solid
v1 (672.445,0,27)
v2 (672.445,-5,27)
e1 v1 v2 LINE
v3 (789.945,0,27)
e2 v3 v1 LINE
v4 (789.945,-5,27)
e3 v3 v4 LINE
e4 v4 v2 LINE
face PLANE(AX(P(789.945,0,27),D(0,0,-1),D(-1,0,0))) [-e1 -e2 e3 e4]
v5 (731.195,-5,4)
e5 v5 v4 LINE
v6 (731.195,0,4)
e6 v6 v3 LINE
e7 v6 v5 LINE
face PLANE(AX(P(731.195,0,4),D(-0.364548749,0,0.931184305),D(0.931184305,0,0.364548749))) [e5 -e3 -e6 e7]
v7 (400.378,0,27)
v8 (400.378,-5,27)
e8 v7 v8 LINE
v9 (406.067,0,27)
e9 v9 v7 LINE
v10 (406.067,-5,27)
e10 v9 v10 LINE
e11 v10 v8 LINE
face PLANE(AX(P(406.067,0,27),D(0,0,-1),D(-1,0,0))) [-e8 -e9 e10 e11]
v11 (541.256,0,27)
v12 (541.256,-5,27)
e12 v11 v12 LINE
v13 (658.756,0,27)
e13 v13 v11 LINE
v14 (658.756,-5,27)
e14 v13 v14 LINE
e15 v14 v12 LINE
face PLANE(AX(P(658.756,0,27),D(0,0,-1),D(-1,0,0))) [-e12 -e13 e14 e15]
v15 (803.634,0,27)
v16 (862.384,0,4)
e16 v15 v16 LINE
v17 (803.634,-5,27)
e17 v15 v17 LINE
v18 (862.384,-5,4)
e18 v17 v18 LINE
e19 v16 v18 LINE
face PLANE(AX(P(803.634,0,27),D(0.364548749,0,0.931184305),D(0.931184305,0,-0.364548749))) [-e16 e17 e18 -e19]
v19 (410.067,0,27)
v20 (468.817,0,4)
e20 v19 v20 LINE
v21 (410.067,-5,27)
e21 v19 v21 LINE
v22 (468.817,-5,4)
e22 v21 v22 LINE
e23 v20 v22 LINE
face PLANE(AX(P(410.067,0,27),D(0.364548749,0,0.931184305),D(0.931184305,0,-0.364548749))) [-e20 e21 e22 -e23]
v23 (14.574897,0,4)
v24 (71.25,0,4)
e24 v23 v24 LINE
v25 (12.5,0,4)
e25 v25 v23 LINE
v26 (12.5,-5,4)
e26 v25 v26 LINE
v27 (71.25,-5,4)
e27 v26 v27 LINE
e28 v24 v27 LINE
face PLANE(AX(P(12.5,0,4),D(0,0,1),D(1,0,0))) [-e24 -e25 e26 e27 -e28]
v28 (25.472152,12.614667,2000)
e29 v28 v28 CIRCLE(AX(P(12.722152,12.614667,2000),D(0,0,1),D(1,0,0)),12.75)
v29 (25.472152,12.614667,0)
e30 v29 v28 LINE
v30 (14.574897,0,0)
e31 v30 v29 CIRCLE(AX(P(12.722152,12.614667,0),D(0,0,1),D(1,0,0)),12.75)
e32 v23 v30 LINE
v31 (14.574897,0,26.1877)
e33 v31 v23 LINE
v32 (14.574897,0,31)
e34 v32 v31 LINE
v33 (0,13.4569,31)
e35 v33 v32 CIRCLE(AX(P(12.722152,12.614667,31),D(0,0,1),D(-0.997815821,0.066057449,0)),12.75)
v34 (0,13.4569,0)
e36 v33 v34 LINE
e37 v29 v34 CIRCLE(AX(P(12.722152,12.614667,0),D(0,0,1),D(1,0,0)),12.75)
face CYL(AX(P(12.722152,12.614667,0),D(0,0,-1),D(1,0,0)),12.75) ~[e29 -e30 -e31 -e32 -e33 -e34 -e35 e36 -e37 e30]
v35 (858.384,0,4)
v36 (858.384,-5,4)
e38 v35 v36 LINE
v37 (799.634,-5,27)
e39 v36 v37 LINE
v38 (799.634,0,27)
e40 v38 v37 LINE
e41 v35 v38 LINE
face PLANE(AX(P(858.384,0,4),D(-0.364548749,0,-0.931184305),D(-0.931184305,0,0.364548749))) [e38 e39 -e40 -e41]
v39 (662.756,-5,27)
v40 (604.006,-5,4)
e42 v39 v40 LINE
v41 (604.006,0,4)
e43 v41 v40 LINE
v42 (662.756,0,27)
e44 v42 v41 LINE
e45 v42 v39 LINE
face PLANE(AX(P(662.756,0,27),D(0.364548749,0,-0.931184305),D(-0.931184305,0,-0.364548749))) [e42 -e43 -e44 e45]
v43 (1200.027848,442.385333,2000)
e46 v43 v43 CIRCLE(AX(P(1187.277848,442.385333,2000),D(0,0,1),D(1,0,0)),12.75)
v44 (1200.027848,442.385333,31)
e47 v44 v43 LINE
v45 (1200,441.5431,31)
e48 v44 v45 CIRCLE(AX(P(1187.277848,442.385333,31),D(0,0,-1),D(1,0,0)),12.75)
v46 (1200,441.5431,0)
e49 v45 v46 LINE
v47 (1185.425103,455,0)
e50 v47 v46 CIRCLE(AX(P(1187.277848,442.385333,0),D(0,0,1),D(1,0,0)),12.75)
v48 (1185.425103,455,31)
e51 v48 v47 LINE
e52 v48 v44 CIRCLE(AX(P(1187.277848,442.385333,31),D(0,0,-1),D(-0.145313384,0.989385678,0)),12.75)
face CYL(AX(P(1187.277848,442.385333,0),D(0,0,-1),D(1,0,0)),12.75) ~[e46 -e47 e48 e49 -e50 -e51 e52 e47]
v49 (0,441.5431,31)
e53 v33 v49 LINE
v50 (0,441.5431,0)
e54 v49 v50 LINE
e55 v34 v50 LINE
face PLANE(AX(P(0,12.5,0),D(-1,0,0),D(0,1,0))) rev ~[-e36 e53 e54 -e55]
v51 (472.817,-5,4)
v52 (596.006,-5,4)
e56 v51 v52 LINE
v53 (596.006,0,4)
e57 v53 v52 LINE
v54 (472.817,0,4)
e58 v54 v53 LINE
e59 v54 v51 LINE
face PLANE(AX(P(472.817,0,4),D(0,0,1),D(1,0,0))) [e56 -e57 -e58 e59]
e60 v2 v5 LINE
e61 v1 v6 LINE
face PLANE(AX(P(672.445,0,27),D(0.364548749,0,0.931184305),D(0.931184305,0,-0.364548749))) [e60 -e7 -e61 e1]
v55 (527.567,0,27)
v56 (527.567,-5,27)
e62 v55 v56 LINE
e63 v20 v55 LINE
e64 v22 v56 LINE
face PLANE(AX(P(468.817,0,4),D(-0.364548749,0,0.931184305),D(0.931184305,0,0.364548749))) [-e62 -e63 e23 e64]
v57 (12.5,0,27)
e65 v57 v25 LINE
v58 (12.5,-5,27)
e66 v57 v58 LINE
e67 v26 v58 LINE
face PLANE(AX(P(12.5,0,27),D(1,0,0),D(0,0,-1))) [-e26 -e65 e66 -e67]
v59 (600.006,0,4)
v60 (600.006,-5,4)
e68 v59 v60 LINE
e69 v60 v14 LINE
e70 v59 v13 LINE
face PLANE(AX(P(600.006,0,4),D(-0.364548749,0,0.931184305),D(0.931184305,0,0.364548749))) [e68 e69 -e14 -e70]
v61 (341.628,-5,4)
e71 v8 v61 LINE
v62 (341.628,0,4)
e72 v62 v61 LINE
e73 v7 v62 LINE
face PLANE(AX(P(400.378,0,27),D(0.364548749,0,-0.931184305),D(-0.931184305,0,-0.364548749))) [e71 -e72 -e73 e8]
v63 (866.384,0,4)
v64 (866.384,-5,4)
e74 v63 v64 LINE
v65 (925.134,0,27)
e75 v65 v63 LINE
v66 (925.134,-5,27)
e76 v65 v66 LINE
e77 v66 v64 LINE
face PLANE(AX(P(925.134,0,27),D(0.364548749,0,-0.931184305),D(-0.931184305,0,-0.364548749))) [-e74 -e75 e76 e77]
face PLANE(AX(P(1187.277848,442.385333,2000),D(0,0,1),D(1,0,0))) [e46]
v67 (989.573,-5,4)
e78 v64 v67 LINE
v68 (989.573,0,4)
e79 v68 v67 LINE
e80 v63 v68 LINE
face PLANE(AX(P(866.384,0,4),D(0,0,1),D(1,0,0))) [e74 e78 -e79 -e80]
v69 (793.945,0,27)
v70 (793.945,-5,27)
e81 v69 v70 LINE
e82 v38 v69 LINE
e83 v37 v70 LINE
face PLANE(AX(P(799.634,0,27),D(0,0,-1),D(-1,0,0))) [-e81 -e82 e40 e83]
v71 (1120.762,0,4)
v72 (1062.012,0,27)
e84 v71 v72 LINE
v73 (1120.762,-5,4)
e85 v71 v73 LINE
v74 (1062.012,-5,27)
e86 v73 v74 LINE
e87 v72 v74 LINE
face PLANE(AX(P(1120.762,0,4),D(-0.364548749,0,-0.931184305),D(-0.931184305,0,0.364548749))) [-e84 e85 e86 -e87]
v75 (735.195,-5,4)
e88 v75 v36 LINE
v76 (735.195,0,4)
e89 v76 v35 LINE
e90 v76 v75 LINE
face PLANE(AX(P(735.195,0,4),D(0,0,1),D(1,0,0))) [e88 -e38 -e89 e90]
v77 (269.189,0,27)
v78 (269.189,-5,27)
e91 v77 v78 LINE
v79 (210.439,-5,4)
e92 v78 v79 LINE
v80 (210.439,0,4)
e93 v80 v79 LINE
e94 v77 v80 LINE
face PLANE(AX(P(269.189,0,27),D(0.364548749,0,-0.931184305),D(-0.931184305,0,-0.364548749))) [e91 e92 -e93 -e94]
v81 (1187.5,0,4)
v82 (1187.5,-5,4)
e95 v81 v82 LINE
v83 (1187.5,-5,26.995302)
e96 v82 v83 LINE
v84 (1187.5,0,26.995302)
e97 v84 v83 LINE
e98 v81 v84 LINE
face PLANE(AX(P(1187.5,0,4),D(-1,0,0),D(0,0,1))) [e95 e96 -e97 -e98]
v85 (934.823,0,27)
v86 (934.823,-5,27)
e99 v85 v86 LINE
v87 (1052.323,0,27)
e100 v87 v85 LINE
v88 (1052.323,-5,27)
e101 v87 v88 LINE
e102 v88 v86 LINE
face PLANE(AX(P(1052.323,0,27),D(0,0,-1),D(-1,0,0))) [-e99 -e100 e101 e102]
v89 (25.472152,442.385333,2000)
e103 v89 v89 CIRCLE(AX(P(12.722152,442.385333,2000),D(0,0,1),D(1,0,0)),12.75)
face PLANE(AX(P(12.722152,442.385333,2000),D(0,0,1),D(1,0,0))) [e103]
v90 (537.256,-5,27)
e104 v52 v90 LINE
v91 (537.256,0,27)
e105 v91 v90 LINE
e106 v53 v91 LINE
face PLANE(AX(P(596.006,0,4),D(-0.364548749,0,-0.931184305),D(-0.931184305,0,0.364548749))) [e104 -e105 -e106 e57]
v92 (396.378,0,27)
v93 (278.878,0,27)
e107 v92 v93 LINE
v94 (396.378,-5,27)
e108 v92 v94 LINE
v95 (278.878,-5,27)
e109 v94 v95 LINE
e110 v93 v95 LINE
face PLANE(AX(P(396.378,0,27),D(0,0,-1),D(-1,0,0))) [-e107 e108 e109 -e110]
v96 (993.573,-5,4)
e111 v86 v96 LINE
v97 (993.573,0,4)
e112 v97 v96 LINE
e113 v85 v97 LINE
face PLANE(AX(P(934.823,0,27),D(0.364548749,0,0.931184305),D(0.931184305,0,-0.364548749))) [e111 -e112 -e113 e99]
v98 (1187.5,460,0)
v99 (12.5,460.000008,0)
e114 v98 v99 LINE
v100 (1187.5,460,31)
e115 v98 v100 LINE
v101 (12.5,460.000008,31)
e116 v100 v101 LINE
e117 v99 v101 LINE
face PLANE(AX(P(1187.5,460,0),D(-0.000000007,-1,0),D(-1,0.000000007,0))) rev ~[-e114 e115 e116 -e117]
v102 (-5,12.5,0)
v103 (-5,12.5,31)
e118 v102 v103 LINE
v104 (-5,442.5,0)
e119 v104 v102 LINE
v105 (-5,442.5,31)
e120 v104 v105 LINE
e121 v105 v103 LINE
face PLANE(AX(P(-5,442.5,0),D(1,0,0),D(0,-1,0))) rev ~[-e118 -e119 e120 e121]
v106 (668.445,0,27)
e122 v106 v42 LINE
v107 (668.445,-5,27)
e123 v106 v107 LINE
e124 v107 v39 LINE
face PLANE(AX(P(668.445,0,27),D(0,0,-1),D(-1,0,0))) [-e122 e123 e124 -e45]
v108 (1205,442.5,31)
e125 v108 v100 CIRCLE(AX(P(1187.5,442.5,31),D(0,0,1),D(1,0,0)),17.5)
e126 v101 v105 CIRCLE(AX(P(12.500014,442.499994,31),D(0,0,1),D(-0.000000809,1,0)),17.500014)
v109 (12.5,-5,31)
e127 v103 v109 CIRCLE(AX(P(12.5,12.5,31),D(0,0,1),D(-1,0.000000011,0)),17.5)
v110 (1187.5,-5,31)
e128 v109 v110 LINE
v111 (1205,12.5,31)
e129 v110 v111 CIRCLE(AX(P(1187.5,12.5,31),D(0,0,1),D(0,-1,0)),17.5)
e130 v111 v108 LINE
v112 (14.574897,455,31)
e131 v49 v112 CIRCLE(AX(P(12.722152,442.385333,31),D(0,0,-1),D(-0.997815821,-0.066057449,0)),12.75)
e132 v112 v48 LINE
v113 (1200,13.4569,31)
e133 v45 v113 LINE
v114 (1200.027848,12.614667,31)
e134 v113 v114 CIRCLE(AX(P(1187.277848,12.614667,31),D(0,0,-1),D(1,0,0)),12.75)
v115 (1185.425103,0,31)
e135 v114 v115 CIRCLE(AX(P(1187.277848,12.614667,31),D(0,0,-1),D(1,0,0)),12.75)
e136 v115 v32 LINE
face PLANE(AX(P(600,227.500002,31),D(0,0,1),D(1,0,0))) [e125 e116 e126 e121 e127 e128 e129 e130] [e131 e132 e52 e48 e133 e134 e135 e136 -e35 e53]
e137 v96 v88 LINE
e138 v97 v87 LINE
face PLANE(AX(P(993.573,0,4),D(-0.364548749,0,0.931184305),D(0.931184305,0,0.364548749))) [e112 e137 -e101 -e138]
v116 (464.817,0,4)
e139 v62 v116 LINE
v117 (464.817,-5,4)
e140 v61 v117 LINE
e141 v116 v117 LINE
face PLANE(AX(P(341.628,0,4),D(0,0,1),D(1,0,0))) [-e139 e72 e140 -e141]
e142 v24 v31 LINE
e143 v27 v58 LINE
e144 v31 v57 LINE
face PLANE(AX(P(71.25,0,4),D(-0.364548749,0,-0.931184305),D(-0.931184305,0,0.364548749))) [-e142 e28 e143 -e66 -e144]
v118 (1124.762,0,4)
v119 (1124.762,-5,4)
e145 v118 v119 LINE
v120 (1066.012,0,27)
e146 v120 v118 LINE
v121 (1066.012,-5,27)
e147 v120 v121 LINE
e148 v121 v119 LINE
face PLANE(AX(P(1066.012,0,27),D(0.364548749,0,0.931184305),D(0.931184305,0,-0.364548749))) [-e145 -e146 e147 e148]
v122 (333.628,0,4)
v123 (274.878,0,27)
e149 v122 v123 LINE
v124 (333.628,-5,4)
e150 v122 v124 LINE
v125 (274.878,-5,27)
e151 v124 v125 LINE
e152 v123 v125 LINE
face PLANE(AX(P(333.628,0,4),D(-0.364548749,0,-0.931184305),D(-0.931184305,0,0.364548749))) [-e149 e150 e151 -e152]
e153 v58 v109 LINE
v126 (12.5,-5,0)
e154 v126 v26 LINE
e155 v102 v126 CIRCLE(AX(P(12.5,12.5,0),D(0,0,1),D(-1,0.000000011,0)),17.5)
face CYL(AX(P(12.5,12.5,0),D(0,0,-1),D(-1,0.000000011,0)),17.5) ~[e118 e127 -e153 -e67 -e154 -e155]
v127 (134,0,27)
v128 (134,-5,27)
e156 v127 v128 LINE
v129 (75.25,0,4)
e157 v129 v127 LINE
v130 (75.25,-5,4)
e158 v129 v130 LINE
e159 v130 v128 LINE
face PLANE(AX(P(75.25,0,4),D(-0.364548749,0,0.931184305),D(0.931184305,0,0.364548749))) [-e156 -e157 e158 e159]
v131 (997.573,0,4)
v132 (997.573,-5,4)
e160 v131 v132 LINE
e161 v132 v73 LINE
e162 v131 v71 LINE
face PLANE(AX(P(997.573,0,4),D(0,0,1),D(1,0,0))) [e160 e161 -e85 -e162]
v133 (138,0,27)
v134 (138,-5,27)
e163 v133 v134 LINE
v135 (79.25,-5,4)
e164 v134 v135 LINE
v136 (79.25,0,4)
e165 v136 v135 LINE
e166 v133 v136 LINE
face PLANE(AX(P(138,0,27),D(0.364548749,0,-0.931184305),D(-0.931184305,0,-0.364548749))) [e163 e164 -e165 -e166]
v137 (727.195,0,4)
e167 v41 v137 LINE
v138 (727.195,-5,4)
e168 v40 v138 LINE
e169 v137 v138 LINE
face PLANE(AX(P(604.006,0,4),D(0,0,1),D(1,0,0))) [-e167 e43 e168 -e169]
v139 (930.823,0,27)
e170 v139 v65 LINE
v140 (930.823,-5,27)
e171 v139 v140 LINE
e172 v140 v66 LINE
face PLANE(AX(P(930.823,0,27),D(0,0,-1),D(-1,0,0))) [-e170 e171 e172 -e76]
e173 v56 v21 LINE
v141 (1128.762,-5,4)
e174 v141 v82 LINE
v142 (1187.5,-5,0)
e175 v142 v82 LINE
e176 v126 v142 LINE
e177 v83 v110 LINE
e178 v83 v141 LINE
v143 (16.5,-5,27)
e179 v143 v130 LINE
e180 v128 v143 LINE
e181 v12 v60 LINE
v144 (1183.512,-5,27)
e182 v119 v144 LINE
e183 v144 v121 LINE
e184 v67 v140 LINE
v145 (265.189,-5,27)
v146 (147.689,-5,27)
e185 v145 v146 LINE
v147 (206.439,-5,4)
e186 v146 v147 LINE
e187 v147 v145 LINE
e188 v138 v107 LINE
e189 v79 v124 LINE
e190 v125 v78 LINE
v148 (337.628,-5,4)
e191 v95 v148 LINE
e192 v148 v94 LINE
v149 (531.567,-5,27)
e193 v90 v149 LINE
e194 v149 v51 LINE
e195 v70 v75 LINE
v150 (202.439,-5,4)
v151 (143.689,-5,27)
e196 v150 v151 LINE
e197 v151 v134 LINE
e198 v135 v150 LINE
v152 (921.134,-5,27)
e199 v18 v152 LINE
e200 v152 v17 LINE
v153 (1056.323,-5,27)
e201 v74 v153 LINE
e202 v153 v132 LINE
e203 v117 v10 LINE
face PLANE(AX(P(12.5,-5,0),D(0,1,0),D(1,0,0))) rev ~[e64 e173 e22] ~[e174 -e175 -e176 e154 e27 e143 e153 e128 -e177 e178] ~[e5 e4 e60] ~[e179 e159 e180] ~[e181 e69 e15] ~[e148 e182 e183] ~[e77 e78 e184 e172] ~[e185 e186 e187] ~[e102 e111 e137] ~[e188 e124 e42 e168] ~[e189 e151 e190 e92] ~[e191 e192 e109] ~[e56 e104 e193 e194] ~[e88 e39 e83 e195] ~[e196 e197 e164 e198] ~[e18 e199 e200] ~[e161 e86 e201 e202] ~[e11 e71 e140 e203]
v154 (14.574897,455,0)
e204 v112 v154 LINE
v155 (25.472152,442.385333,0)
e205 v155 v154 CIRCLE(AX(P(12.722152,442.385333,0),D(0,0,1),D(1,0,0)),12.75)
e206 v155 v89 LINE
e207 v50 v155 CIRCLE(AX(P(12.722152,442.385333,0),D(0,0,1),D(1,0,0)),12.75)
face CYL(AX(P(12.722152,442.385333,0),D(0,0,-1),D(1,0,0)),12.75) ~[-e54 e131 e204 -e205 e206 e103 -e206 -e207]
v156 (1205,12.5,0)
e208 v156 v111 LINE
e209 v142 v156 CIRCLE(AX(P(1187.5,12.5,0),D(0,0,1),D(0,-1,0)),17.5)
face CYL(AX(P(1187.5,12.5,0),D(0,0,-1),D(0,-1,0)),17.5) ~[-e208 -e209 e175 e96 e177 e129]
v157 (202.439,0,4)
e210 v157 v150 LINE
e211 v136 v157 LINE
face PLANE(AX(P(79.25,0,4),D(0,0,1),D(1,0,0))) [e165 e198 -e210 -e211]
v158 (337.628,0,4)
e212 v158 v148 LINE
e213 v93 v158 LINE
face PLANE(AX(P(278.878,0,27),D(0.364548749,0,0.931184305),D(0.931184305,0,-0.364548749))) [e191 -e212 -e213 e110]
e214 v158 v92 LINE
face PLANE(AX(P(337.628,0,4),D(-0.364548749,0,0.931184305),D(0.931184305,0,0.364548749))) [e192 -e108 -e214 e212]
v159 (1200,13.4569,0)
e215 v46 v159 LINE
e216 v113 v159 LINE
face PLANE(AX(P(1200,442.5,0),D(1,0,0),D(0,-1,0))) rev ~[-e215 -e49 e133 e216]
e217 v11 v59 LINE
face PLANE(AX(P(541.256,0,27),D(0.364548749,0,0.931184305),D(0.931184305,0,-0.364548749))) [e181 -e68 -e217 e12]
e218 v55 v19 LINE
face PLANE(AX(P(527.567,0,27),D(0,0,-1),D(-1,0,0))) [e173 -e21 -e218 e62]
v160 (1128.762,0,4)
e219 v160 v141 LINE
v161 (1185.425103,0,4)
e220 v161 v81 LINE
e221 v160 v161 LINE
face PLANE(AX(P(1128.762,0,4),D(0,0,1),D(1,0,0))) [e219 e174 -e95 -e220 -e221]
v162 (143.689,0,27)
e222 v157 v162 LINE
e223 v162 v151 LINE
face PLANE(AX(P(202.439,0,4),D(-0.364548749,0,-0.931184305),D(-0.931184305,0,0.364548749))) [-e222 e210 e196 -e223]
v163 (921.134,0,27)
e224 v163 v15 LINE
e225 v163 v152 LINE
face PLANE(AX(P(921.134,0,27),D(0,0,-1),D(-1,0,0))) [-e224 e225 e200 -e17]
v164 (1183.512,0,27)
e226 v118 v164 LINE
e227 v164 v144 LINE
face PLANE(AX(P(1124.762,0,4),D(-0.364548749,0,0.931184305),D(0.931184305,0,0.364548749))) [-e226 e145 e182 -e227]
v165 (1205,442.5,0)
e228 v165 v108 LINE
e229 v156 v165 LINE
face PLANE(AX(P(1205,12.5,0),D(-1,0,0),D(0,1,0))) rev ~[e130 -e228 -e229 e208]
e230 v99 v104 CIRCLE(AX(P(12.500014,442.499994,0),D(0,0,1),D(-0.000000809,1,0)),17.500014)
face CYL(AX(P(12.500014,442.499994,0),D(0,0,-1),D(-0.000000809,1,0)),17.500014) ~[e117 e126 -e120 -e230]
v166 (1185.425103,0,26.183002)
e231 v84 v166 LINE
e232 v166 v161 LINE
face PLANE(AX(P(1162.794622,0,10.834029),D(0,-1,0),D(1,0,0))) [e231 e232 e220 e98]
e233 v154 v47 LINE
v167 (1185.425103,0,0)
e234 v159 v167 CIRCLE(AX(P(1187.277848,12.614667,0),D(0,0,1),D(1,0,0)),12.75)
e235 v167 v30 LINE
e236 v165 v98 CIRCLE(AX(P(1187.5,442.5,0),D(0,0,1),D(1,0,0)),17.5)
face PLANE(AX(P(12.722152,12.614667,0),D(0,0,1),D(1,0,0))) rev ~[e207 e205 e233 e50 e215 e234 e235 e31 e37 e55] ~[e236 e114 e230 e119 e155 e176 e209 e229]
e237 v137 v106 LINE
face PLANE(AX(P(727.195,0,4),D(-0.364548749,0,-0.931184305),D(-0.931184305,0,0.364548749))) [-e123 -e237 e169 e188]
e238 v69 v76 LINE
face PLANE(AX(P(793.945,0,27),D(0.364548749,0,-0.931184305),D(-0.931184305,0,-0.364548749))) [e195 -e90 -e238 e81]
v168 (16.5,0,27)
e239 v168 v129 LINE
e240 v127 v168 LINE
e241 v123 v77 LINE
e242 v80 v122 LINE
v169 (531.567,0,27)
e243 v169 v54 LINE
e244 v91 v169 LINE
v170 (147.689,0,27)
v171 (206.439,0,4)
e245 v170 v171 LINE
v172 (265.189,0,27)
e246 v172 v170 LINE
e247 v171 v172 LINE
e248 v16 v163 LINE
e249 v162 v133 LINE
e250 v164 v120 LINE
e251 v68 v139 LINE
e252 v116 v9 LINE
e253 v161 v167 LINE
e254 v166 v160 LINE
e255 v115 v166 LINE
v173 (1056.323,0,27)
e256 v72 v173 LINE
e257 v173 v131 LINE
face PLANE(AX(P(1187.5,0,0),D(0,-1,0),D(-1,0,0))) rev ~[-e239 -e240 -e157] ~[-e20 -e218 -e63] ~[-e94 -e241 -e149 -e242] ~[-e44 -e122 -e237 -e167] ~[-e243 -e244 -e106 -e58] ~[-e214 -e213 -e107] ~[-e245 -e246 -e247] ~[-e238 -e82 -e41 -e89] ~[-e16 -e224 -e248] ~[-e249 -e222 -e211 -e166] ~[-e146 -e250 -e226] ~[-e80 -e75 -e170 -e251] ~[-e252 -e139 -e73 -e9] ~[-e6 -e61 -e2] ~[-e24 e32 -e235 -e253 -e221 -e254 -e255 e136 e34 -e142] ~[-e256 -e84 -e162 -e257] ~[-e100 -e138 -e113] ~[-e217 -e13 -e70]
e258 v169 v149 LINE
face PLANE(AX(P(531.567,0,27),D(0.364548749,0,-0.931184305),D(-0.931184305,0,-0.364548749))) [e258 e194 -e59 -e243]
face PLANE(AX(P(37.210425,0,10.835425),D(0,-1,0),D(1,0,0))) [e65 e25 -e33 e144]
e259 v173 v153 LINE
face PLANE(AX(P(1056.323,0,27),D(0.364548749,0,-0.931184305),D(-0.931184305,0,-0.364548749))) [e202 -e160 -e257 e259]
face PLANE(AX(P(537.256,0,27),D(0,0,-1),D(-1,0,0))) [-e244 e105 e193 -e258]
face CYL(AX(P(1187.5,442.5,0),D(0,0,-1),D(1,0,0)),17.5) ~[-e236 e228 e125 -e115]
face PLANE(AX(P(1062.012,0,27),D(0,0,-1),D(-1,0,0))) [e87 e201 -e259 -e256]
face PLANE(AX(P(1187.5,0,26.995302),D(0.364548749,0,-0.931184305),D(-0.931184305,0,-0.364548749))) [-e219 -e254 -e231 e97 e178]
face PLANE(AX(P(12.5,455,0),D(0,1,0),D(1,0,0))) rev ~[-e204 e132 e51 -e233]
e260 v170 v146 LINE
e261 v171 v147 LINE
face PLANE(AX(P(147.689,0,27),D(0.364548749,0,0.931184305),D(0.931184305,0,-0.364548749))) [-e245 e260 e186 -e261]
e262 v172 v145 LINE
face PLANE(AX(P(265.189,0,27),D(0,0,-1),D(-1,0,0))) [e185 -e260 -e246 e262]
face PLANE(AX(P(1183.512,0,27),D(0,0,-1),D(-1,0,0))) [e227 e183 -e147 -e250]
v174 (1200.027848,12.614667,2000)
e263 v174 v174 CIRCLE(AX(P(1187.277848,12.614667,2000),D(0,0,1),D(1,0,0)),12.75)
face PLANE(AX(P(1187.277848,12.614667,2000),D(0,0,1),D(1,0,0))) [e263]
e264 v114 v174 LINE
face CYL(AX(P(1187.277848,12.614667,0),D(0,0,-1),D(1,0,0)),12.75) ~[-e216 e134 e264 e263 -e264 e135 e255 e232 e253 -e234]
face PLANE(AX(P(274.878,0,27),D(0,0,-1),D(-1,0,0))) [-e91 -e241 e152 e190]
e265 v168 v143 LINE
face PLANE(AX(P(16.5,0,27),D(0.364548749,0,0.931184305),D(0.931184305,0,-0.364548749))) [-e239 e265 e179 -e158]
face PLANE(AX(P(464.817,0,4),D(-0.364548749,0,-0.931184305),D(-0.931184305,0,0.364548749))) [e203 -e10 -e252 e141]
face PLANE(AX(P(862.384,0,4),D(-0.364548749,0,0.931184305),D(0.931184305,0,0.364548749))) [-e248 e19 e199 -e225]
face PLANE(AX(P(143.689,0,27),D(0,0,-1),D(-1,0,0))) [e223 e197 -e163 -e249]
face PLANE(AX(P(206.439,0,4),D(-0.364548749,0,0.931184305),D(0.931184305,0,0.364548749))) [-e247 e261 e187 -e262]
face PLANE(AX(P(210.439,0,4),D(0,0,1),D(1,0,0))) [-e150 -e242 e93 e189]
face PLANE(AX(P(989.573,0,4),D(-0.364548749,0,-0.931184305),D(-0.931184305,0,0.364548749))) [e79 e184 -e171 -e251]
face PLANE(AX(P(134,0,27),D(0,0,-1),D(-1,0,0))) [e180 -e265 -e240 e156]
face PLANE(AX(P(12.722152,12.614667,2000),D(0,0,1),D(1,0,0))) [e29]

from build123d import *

# Parameters (mm, degrees)
F1_DEPTH = 31
F2_R     = 12.75
F3_DEPTH = 2000
F5_DEPTH = 25


# Not quite as in the source:
# - ends of sketch curves that miss each other by under 0.0002 mm in the source are joined


with BuildPart() as f1:
    # F0 (on Top) → F1 (new body)
    with BuildSketch(Plane.XY):
        with BuildLine():
            Line((-4.9999998882, 442.5), (-4.9999998882, 12.5))
            ThreePointArc((-4.9999998882, 12.5), (0.1256313292, 0.1256313292), (12.5, -5))
            Line((12.5, -5), (1187.5, -5))
            ThreePointArc((1187.5, -5), (1199.8743686708, 0.1256313292), (1205, 12.5))
            Line((1205, 12.5), (1205, 442.5))
            ThreePointArc((1205, 442.5), (1199.8743686708, 454.8743686708), (1187.5, 460))
            Line((1187.5, 460), (12.5, 460.0000083447))
            ThreePointArc((12.5, 460.0000083447), (0.1256313292, 454.8743686708), (-4.9999998882, 442.5))
        make_face()
        with BuildLine():
            Line((1187.5, 0), (12.5, 0))
            ThreePointArc((12.5, 0), (3.6611652352, 3.6611652352), (0, 12.5))
            Line((0, 12.5), (0, 442.5))
            ThreePointArc((0, 442.5), (3.6611652352, 451.3388347648), (12.5, 455))
            Line((12.5, 455), (1187.5, 455))
            ThreePointArc((1187.5, 455), (1196.3388347648, 451.3388347648), (1200, 442.5))
            Line((1200, 442.5), (1200, 12.5))
            ThreePointArc((1200, 12.5), (1196.3388347648, 3.6611652352), (1187.5, 0))
        make_face(mode=Mode.SUBTRACT)
    extrude(amount=F1_DEPTH)

    # F2 (on Top) → F3 (join)
    with BuildSketch(Plane.XY):
        with Locations((12.7221517224, 12.6146673983)):
            Circle(F2_R)
        with Locations((12.7221517224, 442.3853326017)):
            Circle(F2_R)
        with Locations((1187.2778482776, 442.3853326017)):
            Circle(F2_R)
        with Locations((1187.2778482776, 12.6146673983)):
            Circle(F2_R)
    extrude(amount=F3_DEPTH)

    # F4 (on Front) → F5 (cut)
    with BuildSketch(Plane.XZ):
        Polygon((1187.5, 26.9953021277), (1128.762, 4), (1187.5, 4), align=None)
        Polygon((1066.012, 27), (1124.762, 4), (1183.512, 27), align=None)
        Polygon((1056.323, 27), (997.573, 4), (1120.762, 4), (1062.012, 27), align=None)
        Polygon((934.823, 27), (993.573, 4), (1052.323, 27), align=None)
        Polygon((925.134, 27), (866.384, 4), (989.573, 4), (930.823, 27), align=None)
        Polygon((803.634, 27), (862.384, 4), (921.134, 27), align=None)
        Polygon((793.945, 27), (735.195, 4), (858.384, 4), (799.634, 27), align=None)
        Polygon((672.445, 27), (731.195, 4), (789.945, 27), align=None)
        Polygon((662.756, 27), (604.006, 4), (727.195, 4), (668.445, 27), align=None)
        Polygon((541.256, 27), (600.006, 4), (658.756, 27), align=None)
        Polygon((531.567, 27), (472.817, 4), (596.006, 4), (537.256, 27), align=None)
        Polygon((410.067, 27), (468.817, 4), (527.567, 27), align=None)
        Polygon((400.378, 27), (341.628, 4), (464.817, 4), (406.067, 27), align=None)
        Polygon((278.878, 27), (337.628, 4), (396.378, 27), align=None)
        Polygon((269.189, 27), (210.439, 4), (333.628, 4), (274.878, 27), align=None)
        Polygon((265.189, 27), (147.689, 27), (206.439, 4), align=None)
        Polygon((143.689, 27), (138, 27), (79.25, 4), (202.439, 4), align=None)
        Polygon((134, 27), (16.5, 27), (75.25, 4), align=None)
        Polygon((71.25, 4), (12.5, 27), (12.5, 4), align=None)
    extrude(amount=F5_DEPTH, mode=Mode.SUBTRACT)


solid = f1.part
